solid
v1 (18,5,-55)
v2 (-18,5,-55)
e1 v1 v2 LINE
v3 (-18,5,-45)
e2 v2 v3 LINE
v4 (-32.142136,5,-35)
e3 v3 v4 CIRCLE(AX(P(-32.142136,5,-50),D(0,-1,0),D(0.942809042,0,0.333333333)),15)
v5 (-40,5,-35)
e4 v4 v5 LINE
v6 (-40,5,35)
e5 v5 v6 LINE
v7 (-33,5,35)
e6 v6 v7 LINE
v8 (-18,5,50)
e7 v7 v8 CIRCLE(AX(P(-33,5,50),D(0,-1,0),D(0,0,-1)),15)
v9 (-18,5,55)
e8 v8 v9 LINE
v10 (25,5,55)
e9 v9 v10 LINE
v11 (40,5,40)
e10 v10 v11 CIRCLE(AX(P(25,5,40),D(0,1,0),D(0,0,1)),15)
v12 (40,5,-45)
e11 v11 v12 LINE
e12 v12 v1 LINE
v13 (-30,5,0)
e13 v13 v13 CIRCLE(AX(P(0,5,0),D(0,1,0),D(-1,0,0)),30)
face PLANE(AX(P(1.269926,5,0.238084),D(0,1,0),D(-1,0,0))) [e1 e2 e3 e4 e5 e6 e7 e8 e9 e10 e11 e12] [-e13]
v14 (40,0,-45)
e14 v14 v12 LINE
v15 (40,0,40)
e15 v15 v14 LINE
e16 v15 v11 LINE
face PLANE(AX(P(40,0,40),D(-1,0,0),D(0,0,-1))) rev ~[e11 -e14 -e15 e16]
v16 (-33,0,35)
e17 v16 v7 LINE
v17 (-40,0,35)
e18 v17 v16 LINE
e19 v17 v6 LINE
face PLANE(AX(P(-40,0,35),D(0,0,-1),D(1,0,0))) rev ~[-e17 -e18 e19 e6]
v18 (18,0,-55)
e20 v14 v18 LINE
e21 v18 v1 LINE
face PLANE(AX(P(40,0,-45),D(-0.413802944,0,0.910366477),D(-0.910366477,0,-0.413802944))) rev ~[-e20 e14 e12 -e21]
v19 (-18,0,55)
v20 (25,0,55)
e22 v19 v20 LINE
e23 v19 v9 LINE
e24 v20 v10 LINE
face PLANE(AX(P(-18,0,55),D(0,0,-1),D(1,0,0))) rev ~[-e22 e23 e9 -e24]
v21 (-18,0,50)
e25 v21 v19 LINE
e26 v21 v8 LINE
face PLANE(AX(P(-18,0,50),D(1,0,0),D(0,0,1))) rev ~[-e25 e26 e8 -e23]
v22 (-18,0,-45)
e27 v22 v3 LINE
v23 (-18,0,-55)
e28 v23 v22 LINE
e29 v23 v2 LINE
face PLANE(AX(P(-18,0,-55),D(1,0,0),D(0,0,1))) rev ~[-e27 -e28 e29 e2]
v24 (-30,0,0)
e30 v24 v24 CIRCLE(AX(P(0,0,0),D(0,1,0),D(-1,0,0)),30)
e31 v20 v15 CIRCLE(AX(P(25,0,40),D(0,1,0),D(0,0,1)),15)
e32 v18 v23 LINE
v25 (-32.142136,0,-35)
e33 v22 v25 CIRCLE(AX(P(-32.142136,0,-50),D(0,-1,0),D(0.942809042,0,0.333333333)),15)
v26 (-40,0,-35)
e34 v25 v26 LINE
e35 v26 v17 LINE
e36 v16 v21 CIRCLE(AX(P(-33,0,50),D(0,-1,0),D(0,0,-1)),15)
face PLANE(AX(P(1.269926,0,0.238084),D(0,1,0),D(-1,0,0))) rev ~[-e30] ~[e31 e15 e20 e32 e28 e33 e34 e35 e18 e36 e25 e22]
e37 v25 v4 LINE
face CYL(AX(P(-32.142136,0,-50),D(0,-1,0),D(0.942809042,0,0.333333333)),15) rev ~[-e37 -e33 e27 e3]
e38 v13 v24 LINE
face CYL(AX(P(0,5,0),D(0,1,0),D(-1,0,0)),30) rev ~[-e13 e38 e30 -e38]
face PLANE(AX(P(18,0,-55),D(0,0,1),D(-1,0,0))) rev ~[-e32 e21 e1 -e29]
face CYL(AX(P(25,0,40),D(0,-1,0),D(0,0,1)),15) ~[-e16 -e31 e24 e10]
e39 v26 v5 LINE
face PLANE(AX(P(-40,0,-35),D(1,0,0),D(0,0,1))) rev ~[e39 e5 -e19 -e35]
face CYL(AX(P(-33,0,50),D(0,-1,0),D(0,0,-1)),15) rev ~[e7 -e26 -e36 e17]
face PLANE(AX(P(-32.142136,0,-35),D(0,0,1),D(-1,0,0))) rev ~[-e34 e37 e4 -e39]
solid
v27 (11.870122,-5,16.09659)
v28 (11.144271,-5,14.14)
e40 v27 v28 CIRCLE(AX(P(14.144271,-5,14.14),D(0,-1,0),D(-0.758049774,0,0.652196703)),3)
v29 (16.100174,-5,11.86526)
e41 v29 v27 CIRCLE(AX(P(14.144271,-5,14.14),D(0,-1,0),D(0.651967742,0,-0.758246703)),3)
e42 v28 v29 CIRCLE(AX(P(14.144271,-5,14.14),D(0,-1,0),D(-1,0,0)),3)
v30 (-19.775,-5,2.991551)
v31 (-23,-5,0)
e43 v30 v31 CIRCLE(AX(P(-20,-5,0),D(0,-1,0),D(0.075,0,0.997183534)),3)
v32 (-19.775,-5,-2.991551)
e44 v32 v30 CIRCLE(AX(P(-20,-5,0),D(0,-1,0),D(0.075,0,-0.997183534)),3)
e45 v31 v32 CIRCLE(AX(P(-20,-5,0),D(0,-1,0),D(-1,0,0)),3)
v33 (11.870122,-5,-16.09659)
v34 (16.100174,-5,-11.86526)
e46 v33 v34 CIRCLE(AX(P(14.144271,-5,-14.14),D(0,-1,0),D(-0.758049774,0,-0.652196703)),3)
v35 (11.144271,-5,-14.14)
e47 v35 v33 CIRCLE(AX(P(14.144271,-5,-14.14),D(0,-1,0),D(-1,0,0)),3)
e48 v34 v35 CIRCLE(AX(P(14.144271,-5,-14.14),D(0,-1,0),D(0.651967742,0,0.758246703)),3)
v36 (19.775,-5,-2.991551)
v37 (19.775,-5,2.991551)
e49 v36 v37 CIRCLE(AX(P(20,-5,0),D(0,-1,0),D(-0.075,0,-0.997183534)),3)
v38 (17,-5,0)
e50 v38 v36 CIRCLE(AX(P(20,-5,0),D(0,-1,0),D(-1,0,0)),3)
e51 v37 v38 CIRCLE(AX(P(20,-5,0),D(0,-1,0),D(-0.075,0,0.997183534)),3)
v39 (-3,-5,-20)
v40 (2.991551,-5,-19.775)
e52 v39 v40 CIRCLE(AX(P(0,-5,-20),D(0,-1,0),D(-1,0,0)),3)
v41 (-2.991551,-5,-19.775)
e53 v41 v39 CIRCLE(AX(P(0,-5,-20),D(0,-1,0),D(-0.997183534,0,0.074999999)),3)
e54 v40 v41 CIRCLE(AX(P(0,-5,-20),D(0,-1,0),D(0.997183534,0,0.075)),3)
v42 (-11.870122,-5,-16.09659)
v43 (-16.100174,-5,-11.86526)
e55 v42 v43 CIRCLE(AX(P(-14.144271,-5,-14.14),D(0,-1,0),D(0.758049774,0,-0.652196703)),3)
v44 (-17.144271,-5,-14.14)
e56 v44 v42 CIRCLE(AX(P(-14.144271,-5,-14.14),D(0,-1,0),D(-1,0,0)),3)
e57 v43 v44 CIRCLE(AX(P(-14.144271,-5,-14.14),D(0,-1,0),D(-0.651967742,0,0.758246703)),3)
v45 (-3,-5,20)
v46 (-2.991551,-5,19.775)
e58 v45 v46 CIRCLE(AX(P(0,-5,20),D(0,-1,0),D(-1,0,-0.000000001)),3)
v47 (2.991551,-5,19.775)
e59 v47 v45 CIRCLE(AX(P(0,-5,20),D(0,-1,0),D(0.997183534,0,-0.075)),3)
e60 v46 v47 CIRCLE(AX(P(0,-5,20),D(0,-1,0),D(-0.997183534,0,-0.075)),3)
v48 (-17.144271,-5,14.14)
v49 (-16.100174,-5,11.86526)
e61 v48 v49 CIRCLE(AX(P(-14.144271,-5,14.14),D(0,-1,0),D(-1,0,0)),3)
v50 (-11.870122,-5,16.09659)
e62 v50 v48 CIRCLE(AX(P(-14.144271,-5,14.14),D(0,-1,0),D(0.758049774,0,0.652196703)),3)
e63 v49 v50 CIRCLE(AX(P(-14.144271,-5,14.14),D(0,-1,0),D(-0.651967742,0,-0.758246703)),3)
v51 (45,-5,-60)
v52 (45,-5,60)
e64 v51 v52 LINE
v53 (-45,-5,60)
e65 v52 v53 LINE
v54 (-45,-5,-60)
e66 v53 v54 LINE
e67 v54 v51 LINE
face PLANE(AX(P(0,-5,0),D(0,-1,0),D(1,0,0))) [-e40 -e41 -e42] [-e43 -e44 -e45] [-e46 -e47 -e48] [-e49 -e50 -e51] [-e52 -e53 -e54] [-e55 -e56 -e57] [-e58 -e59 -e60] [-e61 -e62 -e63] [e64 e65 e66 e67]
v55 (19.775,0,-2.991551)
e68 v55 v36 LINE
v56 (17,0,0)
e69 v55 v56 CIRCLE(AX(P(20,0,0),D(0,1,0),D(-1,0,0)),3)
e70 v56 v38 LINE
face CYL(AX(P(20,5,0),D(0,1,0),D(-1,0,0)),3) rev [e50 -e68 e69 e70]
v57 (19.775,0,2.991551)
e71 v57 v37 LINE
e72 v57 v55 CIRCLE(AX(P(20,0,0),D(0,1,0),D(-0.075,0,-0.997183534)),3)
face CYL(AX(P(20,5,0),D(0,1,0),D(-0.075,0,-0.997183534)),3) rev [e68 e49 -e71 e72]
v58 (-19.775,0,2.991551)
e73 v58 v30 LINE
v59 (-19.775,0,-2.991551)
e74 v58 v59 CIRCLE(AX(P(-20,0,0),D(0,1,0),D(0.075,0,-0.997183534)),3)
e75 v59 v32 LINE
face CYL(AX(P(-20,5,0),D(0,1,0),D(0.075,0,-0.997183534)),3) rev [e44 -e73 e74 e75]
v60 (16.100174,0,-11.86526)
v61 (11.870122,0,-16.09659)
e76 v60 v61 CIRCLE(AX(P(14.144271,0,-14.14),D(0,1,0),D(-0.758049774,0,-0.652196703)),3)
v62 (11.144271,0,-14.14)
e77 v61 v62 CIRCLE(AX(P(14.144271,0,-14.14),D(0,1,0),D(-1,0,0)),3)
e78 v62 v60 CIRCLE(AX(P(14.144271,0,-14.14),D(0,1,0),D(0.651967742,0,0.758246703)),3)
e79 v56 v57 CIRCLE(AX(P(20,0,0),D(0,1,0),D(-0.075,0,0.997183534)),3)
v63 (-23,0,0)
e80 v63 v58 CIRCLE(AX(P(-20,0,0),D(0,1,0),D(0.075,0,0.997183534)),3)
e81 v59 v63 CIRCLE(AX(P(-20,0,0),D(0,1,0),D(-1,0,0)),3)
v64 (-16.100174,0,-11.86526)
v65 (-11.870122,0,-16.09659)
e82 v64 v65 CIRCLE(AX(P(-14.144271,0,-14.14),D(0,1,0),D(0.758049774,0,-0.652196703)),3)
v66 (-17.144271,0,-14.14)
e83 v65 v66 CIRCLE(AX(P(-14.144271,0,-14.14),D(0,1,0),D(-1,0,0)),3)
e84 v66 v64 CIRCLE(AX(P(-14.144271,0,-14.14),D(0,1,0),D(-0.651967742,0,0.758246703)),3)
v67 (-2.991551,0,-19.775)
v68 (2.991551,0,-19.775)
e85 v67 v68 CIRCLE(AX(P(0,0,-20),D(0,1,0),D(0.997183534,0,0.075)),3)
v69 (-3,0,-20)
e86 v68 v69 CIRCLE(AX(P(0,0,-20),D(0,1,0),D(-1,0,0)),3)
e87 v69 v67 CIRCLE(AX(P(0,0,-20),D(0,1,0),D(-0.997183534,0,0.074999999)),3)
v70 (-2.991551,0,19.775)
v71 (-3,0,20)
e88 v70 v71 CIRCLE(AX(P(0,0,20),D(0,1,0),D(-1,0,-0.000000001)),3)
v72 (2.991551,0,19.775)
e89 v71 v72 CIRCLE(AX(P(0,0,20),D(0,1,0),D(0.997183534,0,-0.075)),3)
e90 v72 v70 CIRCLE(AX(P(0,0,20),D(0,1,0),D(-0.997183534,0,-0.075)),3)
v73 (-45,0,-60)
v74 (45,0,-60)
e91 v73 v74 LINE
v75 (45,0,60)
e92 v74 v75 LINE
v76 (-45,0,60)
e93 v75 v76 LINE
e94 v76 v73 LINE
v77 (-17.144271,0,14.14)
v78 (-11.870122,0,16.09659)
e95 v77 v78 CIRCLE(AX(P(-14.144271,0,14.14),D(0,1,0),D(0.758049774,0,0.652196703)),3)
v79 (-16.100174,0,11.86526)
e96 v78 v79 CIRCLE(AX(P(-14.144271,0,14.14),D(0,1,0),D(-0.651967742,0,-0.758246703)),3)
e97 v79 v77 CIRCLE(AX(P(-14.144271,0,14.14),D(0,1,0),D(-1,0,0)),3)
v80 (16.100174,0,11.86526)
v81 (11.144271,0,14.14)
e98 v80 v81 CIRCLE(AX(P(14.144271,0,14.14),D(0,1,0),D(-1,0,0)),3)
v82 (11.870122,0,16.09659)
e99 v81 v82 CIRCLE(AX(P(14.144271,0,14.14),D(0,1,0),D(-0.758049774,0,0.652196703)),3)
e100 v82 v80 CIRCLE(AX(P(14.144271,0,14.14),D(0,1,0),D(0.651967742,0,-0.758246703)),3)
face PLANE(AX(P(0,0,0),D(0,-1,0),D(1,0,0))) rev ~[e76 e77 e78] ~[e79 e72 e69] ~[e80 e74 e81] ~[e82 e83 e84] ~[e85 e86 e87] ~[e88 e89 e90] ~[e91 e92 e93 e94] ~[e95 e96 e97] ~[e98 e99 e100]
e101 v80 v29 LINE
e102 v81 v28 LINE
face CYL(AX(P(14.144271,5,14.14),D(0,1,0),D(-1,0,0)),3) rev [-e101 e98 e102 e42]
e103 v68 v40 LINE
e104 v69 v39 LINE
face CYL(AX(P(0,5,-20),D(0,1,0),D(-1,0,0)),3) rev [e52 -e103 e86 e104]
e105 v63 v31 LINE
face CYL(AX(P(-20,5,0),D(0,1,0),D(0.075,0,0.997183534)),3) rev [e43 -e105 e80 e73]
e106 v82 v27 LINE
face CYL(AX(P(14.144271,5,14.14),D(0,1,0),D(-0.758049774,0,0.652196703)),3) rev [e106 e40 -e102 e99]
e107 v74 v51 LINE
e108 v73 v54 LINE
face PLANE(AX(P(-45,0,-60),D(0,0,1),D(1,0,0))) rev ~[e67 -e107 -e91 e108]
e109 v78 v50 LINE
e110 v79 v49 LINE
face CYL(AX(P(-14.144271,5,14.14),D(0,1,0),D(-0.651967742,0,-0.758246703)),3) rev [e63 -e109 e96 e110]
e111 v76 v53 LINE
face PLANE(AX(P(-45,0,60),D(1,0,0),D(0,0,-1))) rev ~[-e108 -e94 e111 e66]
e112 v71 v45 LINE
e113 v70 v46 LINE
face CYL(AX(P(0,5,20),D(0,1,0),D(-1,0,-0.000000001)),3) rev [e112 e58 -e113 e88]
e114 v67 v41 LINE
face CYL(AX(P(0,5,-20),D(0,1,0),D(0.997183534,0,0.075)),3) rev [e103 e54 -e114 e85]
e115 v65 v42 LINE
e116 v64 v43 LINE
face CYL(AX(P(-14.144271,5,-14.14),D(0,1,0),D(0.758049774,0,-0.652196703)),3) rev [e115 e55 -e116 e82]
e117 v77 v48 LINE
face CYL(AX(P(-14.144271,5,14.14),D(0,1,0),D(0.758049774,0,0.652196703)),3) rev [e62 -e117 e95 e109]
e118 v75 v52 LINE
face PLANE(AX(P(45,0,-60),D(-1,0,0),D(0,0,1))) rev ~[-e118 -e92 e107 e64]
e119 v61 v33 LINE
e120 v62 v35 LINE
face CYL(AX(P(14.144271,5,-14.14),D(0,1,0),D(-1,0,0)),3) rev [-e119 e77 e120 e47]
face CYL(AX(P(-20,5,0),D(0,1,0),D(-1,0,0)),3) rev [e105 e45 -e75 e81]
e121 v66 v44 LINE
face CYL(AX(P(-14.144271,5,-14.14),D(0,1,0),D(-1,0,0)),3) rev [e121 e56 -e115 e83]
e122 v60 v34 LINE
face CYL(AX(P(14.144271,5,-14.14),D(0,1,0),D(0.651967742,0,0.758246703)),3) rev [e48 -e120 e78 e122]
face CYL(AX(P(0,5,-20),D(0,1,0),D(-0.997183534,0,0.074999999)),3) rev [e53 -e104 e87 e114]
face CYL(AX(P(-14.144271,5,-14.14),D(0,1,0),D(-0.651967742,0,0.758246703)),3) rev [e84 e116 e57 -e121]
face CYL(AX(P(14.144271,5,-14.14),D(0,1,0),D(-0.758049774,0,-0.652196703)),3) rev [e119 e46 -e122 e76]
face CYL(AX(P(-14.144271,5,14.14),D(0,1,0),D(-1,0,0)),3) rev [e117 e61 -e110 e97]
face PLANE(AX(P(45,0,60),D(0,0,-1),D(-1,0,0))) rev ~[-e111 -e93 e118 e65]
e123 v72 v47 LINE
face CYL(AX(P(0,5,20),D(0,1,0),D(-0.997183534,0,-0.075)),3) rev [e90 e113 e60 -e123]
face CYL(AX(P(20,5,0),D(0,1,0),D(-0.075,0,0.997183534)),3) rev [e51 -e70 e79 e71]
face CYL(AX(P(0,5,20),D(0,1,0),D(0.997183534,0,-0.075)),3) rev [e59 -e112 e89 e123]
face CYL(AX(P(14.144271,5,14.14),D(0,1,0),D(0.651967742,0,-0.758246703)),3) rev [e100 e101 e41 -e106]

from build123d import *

# Parameters (mm, degrees)
F1_DEPTH = 5
F3_DEPTH = 5
F4_R     = 30
F5_DEPTH = 5
F6_DEPTH = 10


# Not quite as in the source:
# - a feature names something its author has since deleted; it is built from what else it names


with BuildPart() as f1:
    # F0 (on Front) → F1 (new body)
    with BuildSketch(Plane.XZ):
        Polygon((45, 60), (-45, 60), (-45, 0), (-45, -60), (0, -60), (45, -60), align=None)
    extrude(amount=F1_DEPTH)


with BuildPart() as f3:
    # F2 (on face) → F3 (new body)
    with BuildSketch(Plane(origin=(0, 0, 0), x_dir=(-1, 0, 0), z_dir=(0, 1, 0))):
        with BuildLine():
            Line((-40, -45), (-18, -55))
            Line((-18, -55), (18, -55))
            Line((18, -55), (18, -45))
            ThreePointArc((18, -45), (23.4818815859, -37.7525512861), (32.1421356237, -35))
            Line((32.1421356237, -35), (40, -35))
            Line((40, -35), (40, 35))
            Line((40, 35), (33, 35))
            ThreePointArc((33, 35), (22.3933982822, 39.3933982822), (18, 50))
            Line((18, 50), (18, 55))
            Line((18, 55), (-25, 55))
            ThreePointArc((-25, 55), (-35.6066017178, 50.6066017178), (-40, 40))
            Line((-40, 40), (-40, -45))
        make_face()
    extrude(amount=F3_DEPTH)

    # F4 (on face) → F5 (cut)
    with BuildSketch(Plane(origin=(0, 5, 0), x_dir=(-1, 0, 0), z_dir=(0, 1, 0))):
        Circle(F4_R)
        with BuildLine():
            ThreePointArc((16.1001741522, 11.8652598905), (18.4781684496, 7.6522735674), (19.775, 2.9915506013))
            ThreePointArc((19.775, 2.9915506013), (22.0402205763, 2.1994317448), (23, 0))
            ThreePointArc((23, 0), (22.0402205763, -2.1994317448), (19.775, -2.9915506013))
            ThreePointArc((19.775, -2.9915506013), (18.4781684496, -7.6522735674), (16.1001741522, -11.8652598905))
            ThreePointArc((16.1001741522, -11.8652598905), (16.8707805694, -12.8885427857), (17.144270925, -14.14))
            ThreePointArc((17.144270925, -14.14), (15.187715229, -16.9526898131), (11.870121602, -16.0965901095))
            ThreePointArc((11.870121602, -16.0965901095), (7.6550636836, -18.4770127456), (2.9915506013, -19.775))
            ThreePointArc((2.9915506013, -19.775), (2.9978869061, -19.8874207031), (3, -20))
            ThreePointArc((3, -20), (-0.1125792969, -22.9978869061), (-2.9915506013, -19.775))
            ThreePointArc((-2.9915506013, -19.775), (-7.6550636836, -18.4770127456), (-11.870121602, -16.0965901095))
            ThreePointArc((-11.870121602, -16.0965901095), (-16.2659115638, -16.261), (-16.1001741522, -11.8652598905))
            ThreePointArc((-16.1001741522, -11.8652598905), (-18.4781684496, -7.6522735674), (-19.775, -2.9915506013))
            ThreePointArc((-19.775, -2.9915506013), (-23, 0), (-19.775, 2.9915506013))
            ThreePointArc((-19.775, 2.9915506013), (-18.4781684496, 7.6522735674), (-16.1001741522, 11.8652598905))
            ThreePointArc((-16.1001741522, 11.8652598905), (-16.2659115638, 16.261), (-11.870121602, 16.0965901095))
            ThreePointArc((-11.870121602, 16.0965901095), (-7.6550636836, 18.4770127456), (-2.9915506013, 19.775))
            ThreePointArc((-2.9915506013, 19.775), (-0.1125792969, 22.9978869061), (3, 20))
            ThreePointArc((3, 20), (2.9978869061, 19.8874207031), (2.9915506013, 19.775))
            ThreePointArc((2.9915506013, 19.775), (7.6550636836, 18.4770127456), (11.870121602, 16.0965901095))
            ThreePointArc((11.870121602, 16.0965901095), (15.187715229, 16.9526898131), (17.144270925, 14.14))
            ThreePointArc((17.144270925, 14.14), (16.8707805694, 12.8885427857), (16.1001741522, 11.8652598905))
        make_face(mode=Mode.SUBTRACT)
        with BuildLine():
            ThreePointArc((19.775, -2.9915506013), (17, 0), (19.775, 2.9915506013))
            ThreePointArc((19.775, 2.9915506013), (18.4781684496, 7.6522735674), (16.1001741522, 11.8652598905))
            ThreePointArc((16.1001741522, 11.8652598905), (12.0226302863, 12.019), (11.870121602, 16.0965901095))
            ThreePointArc((11.870121602, 16.0965901095), (7.6550636836, 18.4770127456), (2.9915506013, 19.775))
            ThreePointArc((2.9915506013, 19.775), (0, 17), (-2.9915506013, 19.775))
            ThreePointArc((-2.9915506013, 19.775), (-7.6550636836, 18.4770127456), (-11.870121602, 16.0965901095))
            ThreePointArc((-11.870121602, 16.0965901095), (-11.3315811119, 15.183444304), (-11.144270925, 14.14))
            ThreePointArc((-11.144270925, 14.14), (-12.8928137107, 11.4134903556), (-16.1001741522, 11.8652598905))
            ThreePointArc((-16.1001741522, 11.8652598905), (-18.4781684496, 7.6522735674), (-19.775, 2.9915506013))
            ThreePointArc((-19.775, 2.9915506013), (-17.8005682552, 2.0402205763), (-17, 0))
            ThreePointArc((-17, 0), (-17.8005682552, -2.0402205763), (-19.775, -2.9915506013))
            ThreePointArc((-19.775, -2.9915506013), (-18.4781684496, -7.6522735674), (-16.1001741522, -11.8652598905))
            ThreePointArc((-16.1001741522, -11.8652598905), (-12.8928137107, -11.4134903556), (-11.144270925, -14.14))
            ThreePointArc((-11.144270925, -14.14), (-11.3315811119, -15.183444304), (-11.870121602, -16.0965901095))
            ThreePointArc((-11.870121602, -16.0965901095), (-7.6550636836, -18.4770127456), (-2.9915506013, -19.775))
            ThreePointArc((-2.9915506013, -19.775), (0, -17), (2.9915506013, -19.775))
            ThreePointArc((2.9915506013, -19.775), (7.6550636836, -18.4770127456), (11.870121602, -16.0965901095))
            ThreePointArc((11.870121602, -16.0965901095), (12.0226302863, -12.019), (16.1001741522, -11.8652598905))
            ThreePointArc((16.1001741522, -11.8652598905), (18.4781684496, -7.6522735674), (19.775, -2.9915506013))
        make_face()
    extrude(amount=-F5_DEPTH, mode=Mode.SUBTRACT)


with BuildPart() as f6_tool:
    # F6 (cut): faces of the model
    f6_faces = [f3.part.faces().sort_by_distance(p)[0] for p in [
        (14.144270925, 5, -14.14),
        (20, 5, 0),
        (0, 5, 20),
        (14.144270925, 5, 14.14),
        (-14.144270925, 5, 14.14),
        (-20, 5, 0),
        (-14.144270925, 5, -14.14),
        (0, 5, -20),
    ]]
    extrude(f6_faces, amount=-F6_DEPTH)


with BuildPart() as f1_1:
    add(f1.part)

    # F6: cut by f6_tool
    add(f6_tool.part, mode=Mode.SUBTRACT)


with BuildPart() as f3_1:
    add(f3.part)

    # F6: cut by f6_tool
    add(f6_tool.part, mode=Mode.SUBTRACT)


solid = Compound([f1_1.part, f3_1.part])
